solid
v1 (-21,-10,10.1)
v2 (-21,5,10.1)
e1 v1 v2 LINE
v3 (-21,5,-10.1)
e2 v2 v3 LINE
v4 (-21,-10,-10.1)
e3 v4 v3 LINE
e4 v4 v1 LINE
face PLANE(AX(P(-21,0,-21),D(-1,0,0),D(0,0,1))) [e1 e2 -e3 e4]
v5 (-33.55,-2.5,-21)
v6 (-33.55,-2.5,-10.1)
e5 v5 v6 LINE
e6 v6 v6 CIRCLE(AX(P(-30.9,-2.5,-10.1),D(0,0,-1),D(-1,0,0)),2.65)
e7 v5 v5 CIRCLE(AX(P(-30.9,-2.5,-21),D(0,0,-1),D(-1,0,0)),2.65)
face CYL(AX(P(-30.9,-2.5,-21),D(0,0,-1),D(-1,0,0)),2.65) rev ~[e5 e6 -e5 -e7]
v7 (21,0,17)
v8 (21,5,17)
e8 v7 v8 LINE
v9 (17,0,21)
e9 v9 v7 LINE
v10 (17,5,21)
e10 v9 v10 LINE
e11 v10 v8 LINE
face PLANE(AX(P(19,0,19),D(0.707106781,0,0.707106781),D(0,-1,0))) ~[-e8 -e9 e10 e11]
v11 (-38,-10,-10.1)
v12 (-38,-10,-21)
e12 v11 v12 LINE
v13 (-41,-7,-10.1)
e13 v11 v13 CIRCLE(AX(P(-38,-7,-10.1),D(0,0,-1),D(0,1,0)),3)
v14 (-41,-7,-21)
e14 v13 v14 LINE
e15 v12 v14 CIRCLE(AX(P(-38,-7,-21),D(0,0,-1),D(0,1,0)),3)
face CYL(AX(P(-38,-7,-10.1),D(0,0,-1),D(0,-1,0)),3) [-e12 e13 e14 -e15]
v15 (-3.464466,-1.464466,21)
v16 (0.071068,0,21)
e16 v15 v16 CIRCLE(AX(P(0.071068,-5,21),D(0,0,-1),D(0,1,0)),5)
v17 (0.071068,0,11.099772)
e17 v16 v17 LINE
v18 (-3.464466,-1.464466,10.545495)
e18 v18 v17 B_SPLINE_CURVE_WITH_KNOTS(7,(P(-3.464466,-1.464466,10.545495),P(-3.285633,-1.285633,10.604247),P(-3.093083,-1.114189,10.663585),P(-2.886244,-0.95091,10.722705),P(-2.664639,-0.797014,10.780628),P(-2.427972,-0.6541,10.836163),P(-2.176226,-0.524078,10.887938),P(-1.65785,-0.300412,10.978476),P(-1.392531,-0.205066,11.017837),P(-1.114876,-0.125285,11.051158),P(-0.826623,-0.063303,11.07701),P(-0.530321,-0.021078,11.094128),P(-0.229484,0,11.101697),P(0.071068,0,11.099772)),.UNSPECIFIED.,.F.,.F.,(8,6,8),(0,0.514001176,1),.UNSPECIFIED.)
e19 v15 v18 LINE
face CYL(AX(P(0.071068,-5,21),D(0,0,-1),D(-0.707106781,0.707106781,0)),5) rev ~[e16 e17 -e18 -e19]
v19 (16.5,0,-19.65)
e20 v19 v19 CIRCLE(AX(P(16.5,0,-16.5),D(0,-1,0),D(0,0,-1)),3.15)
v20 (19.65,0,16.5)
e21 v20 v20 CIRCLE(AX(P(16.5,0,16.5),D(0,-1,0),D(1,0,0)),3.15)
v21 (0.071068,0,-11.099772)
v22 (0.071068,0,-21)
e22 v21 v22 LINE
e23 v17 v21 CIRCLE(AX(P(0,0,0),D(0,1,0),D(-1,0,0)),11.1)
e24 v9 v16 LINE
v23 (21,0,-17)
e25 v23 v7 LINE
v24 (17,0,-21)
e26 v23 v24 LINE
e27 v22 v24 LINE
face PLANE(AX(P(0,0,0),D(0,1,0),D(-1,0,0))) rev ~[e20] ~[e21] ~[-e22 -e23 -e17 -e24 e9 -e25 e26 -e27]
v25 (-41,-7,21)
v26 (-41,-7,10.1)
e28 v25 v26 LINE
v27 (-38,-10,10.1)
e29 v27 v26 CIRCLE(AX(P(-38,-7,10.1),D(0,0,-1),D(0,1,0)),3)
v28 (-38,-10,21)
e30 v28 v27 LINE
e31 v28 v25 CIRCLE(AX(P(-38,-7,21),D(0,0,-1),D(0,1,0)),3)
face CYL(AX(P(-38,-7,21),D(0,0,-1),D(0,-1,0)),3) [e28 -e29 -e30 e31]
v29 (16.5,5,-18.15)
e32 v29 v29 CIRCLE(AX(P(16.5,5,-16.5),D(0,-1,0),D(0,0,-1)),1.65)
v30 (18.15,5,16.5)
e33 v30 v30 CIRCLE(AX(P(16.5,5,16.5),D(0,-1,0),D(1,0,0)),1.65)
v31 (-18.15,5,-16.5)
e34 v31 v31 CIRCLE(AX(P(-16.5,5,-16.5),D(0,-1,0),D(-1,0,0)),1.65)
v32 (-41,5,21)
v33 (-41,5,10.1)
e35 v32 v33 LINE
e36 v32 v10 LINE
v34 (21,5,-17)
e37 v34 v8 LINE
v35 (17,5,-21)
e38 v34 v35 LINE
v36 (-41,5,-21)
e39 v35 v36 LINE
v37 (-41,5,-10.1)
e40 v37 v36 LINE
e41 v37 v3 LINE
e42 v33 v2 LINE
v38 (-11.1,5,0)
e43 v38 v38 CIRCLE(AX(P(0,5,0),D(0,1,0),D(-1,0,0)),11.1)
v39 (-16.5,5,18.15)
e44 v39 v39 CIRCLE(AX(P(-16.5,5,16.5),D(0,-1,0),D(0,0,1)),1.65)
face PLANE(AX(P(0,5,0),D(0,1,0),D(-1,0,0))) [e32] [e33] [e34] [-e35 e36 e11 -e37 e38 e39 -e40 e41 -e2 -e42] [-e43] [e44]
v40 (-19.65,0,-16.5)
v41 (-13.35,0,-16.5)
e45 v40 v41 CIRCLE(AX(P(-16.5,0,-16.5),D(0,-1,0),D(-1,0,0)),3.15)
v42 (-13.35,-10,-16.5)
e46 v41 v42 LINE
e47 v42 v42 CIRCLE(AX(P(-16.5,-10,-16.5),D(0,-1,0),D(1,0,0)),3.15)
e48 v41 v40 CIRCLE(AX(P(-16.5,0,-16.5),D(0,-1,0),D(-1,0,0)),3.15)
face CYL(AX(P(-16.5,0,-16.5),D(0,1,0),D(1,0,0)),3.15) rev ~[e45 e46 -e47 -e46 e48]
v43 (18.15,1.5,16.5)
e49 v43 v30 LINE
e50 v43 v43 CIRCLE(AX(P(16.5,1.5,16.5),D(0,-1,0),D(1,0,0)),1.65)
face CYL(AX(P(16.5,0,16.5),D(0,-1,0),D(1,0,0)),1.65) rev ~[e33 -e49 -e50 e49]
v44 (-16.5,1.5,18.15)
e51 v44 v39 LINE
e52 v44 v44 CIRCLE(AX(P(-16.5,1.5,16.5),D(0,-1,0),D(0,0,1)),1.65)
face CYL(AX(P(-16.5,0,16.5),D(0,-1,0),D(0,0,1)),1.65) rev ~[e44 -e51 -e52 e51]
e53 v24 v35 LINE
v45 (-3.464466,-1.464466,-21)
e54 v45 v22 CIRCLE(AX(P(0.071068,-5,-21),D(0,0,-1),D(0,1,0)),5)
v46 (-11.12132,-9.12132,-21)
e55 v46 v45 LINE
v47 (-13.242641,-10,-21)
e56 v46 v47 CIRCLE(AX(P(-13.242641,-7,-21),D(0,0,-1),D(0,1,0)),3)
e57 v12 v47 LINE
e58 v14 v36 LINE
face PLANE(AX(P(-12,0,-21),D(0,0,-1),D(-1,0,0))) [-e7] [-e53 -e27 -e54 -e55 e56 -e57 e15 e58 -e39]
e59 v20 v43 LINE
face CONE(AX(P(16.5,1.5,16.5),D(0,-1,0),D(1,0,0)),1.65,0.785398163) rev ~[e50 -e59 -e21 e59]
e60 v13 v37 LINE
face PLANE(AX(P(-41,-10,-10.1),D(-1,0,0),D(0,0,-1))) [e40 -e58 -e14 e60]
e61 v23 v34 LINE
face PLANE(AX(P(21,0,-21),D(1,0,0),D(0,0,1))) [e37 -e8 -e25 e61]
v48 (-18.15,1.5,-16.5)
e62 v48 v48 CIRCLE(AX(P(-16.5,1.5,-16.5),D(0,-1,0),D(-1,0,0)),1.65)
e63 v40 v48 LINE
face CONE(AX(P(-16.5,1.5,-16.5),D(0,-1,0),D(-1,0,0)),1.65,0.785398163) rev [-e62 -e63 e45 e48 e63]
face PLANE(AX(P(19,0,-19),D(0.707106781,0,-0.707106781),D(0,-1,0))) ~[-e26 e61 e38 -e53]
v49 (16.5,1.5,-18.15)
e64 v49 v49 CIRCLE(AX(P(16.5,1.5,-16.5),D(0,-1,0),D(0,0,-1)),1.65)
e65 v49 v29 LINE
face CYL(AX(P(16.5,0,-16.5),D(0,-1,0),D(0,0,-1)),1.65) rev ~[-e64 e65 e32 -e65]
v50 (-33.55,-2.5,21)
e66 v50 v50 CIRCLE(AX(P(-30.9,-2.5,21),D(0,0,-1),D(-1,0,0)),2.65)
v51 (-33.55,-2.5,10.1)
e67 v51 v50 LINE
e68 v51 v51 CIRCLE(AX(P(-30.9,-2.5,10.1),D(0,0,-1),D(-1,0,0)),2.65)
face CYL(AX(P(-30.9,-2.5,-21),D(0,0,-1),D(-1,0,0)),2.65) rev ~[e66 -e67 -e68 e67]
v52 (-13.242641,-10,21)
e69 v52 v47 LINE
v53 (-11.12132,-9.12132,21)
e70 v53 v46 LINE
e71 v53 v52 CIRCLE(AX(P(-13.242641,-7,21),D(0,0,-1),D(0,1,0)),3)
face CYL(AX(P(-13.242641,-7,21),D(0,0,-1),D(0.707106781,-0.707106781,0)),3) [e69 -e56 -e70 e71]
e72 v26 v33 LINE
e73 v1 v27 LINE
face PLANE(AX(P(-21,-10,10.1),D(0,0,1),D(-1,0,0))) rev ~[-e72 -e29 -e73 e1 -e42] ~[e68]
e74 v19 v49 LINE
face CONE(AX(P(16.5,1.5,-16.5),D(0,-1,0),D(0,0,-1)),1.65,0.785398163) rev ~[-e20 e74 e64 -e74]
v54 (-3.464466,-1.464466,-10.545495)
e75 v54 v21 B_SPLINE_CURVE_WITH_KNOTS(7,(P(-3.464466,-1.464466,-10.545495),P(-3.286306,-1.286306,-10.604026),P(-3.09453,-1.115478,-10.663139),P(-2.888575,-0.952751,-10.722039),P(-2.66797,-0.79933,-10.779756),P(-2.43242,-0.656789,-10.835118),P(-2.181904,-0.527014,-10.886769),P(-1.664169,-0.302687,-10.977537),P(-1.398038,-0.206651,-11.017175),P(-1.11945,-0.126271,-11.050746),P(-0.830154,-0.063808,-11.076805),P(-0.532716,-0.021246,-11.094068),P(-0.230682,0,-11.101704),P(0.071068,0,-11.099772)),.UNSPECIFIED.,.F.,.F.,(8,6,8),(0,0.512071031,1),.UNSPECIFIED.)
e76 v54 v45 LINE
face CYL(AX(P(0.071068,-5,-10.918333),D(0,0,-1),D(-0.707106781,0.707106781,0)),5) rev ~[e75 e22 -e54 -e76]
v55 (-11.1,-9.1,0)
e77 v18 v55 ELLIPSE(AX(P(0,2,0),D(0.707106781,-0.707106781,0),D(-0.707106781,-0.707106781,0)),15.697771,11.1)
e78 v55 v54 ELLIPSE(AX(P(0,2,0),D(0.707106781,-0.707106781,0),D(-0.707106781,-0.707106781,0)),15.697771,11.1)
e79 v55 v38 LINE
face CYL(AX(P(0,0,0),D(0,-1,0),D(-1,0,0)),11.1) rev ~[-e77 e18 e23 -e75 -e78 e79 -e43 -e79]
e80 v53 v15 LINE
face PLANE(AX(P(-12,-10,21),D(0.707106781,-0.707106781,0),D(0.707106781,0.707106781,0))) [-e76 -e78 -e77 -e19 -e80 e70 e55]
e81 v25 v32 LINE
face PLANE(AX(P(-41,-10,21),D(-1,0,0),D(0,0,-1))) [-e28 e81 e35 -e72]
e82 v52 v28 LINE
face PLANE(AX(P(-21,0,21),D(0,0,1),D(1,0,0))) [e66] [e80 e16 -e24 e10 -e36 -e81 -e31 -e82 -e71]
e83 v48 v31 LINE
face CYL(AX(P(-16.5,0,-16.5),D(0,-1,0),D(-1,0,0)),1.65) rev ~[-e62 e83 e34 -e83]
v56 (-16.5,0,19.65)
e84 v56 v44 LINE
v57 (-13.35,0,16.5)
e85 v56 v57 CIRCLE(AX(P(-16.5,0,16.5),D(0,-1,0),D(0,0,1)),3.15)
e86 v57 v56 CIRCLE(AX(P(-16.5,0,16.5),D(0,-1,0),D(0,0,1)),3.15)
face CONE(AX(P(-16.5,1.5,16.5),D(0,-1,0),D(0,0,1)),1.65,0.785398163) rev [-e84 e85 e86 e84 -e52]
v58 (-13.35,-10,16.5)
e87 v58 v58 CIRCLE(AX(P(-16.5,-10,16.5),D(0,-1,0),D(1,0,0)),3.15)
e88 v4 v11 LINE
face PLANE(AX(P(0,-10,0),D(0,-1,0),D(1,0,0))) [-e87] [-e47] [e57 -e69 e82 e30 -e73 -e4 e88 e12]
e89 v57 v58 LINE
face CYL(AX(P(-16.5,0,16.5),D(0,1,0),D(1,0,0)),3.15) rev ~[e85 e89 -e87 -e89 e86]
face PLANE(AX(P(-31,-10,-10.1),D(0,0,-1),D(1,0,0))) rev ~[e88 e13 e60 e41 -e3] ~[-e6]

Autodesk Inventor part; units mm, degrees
ref_plane "YZ Plane" through (0, 0, 0) normal (1, 0, 0) x (0, 1, 0)
ref_plane "XZ Plane" through (0, 0, 0) normal (0, 1, 0) x (-1, 0, 0)
ref_plane "XY Plane" through (0, 0, 0) normal (0, 0, 1) x (1, 0, 0)
sketch "Boceto1" plane through (0, 0, 0) normal (0, 1, 0) x (-1, 0, 0)
  line L0 (-21, 21) -> (21, 21)
  line L1 (21, 21) -> (21, -21)
  line L2 (21, -21) -> (-21, -21)
  line L3 (-21, -21) -> (-21, 21)
  line L4 (-21, 21) -> (21, -21) construction
  line L5 (21, 21) -> (-21, -21) construction
  circle A0 centre (0, 0) radius 11.1
  dimension "d0" = 42
  dimension "d1" = 42
  dimension "d2" = 22.2
extrude "Extrusión1" add sketch "Boceto1" along normal blind 5
sketch "Boceto3" plane through (0, 0, 0) normal (0, -1, 0) x (1, 0, 0)
  circle A0 centre (16.5, 16.5) radius 1.65
  point P0 (0, 0)
  dimension "d9" = 3.3
  dimension "d10" = 16.5
  dimension "d11" = 16.5
extrude "Extrusión3" cut sketch "Boceto3" against normal through all
chamfer "Chaflán1" distance 1.5 angle 45 1 edges at (14.85, 0, 16.5)
pattern_circular "Patrón circular1" count 4 over 360 about axis through (0, 0, 0) along (0, 1, 0) of "Extrusión3", "Chaflán1"
chamfer "Chaflán3" distance 4 angle 45 2 edges at (21, 2.5, -21) (21, 2.5, 21)
sketch "Boceto4" plane through (0, 0, 0) normal (0, -1, 0) x (1, 0, 0)
  circle A0 centre (-16.5, 16.5) radius 3.15 projected
  circle A1 centre (-16.5, 16.5) radius 1.65 projected
  circle A2 centre (-16.5, -16.5) radius 1.65 projected
  circle A3 centre (-16.5, -16.5) radius 3.15 projected
  line L0 (-21, -21) -> (-21, 21) projected
  line L1 (17, -21) -> (-21, -21) projected
  line L2 (-21, 21) -> (-12, 21)
  line L3 (-12, 21) -> (-12, -21)
  line L4 (-12, -21) -> (-21, -21)
  line L5 (-21, -21) -> (-21, 21)
  point P0 (0, 0)
  dimension "d27" = 9
extrude "Extrusión4" add sketch "Boceto4" along normal blind 10 contours L0 L2 L3 L1
sketch "Boceto5" plane through (0, -10, 0) normal (0, -1, 0) x (1, 0, 0)
  line L0 (-21, -21) -> (-21, 21) projected
  line L1 (-21, 21) -> (-41, 21)
  line L2 (-41, 21) -> (-41, -21)
  line L3 (-41, -21) -> (-21, -21)
  line L4 (-21, -21) -> (-21, 21)
  line L5 (-21, 10.1) -> (-41, 10.1)
  line L6 (-41, 10.1) -> (-41, -10.1)
  line L7 (-41, -10.1) -> (-21, -10.1)
  line L8 (-21, -10.1) -> (-21, 10.1)
  line L9 (-31, 10.1) -> (-31, 21)
  line L10 (-31, -10.1) -> (-31, -21)
  line L11 (-21, -21) -> (-12, -21) projected
  point P0 (0, 0)
  dimension "d30" = 20.2
  dimension "d31" = 20
extrude "Extrusión5" add sketch "Boceto5" against normal up to surface (15 mm away) contours L3 L10 L7 L0 | L3 L2 L7 L10 | L5 L9 L1 L0 | L5 L2 L1 L9
chamfer "Chaflán4" distance 10 angle 45 1 edges at (-12, 0, 0)
fillet "Empalme2" radius 5 2 edges at (-2, 0, -15.9592) (-2, 0, 15.9592)
fillet "Empalme3" radius 3 1 edges at (-12, -10, 0)
fillet "Empalme4" radius 3 2 edges at (-41, -10, 15.55) (-41, -10, -15.55)
sketch "Boceto6" plane through (17, 0, -21) normal (0, 0, -1) x (-1, 0, 0)
  circle A0 centre (47.9, -2.5) radius 2.65
  line L0 (0, 5) -> (58, 5) projected
  line L1 (58, -7) -> (58, 5) projected
  point P0 (17, 0)
  dimension "d40" = 7.5
  dimension "d41" = 10.1
  dimension "d42" = 5.3
extrude "Extrusión6" cut sketch "Boceto6" against normal through all
properties part number "Zmotorsupport"
